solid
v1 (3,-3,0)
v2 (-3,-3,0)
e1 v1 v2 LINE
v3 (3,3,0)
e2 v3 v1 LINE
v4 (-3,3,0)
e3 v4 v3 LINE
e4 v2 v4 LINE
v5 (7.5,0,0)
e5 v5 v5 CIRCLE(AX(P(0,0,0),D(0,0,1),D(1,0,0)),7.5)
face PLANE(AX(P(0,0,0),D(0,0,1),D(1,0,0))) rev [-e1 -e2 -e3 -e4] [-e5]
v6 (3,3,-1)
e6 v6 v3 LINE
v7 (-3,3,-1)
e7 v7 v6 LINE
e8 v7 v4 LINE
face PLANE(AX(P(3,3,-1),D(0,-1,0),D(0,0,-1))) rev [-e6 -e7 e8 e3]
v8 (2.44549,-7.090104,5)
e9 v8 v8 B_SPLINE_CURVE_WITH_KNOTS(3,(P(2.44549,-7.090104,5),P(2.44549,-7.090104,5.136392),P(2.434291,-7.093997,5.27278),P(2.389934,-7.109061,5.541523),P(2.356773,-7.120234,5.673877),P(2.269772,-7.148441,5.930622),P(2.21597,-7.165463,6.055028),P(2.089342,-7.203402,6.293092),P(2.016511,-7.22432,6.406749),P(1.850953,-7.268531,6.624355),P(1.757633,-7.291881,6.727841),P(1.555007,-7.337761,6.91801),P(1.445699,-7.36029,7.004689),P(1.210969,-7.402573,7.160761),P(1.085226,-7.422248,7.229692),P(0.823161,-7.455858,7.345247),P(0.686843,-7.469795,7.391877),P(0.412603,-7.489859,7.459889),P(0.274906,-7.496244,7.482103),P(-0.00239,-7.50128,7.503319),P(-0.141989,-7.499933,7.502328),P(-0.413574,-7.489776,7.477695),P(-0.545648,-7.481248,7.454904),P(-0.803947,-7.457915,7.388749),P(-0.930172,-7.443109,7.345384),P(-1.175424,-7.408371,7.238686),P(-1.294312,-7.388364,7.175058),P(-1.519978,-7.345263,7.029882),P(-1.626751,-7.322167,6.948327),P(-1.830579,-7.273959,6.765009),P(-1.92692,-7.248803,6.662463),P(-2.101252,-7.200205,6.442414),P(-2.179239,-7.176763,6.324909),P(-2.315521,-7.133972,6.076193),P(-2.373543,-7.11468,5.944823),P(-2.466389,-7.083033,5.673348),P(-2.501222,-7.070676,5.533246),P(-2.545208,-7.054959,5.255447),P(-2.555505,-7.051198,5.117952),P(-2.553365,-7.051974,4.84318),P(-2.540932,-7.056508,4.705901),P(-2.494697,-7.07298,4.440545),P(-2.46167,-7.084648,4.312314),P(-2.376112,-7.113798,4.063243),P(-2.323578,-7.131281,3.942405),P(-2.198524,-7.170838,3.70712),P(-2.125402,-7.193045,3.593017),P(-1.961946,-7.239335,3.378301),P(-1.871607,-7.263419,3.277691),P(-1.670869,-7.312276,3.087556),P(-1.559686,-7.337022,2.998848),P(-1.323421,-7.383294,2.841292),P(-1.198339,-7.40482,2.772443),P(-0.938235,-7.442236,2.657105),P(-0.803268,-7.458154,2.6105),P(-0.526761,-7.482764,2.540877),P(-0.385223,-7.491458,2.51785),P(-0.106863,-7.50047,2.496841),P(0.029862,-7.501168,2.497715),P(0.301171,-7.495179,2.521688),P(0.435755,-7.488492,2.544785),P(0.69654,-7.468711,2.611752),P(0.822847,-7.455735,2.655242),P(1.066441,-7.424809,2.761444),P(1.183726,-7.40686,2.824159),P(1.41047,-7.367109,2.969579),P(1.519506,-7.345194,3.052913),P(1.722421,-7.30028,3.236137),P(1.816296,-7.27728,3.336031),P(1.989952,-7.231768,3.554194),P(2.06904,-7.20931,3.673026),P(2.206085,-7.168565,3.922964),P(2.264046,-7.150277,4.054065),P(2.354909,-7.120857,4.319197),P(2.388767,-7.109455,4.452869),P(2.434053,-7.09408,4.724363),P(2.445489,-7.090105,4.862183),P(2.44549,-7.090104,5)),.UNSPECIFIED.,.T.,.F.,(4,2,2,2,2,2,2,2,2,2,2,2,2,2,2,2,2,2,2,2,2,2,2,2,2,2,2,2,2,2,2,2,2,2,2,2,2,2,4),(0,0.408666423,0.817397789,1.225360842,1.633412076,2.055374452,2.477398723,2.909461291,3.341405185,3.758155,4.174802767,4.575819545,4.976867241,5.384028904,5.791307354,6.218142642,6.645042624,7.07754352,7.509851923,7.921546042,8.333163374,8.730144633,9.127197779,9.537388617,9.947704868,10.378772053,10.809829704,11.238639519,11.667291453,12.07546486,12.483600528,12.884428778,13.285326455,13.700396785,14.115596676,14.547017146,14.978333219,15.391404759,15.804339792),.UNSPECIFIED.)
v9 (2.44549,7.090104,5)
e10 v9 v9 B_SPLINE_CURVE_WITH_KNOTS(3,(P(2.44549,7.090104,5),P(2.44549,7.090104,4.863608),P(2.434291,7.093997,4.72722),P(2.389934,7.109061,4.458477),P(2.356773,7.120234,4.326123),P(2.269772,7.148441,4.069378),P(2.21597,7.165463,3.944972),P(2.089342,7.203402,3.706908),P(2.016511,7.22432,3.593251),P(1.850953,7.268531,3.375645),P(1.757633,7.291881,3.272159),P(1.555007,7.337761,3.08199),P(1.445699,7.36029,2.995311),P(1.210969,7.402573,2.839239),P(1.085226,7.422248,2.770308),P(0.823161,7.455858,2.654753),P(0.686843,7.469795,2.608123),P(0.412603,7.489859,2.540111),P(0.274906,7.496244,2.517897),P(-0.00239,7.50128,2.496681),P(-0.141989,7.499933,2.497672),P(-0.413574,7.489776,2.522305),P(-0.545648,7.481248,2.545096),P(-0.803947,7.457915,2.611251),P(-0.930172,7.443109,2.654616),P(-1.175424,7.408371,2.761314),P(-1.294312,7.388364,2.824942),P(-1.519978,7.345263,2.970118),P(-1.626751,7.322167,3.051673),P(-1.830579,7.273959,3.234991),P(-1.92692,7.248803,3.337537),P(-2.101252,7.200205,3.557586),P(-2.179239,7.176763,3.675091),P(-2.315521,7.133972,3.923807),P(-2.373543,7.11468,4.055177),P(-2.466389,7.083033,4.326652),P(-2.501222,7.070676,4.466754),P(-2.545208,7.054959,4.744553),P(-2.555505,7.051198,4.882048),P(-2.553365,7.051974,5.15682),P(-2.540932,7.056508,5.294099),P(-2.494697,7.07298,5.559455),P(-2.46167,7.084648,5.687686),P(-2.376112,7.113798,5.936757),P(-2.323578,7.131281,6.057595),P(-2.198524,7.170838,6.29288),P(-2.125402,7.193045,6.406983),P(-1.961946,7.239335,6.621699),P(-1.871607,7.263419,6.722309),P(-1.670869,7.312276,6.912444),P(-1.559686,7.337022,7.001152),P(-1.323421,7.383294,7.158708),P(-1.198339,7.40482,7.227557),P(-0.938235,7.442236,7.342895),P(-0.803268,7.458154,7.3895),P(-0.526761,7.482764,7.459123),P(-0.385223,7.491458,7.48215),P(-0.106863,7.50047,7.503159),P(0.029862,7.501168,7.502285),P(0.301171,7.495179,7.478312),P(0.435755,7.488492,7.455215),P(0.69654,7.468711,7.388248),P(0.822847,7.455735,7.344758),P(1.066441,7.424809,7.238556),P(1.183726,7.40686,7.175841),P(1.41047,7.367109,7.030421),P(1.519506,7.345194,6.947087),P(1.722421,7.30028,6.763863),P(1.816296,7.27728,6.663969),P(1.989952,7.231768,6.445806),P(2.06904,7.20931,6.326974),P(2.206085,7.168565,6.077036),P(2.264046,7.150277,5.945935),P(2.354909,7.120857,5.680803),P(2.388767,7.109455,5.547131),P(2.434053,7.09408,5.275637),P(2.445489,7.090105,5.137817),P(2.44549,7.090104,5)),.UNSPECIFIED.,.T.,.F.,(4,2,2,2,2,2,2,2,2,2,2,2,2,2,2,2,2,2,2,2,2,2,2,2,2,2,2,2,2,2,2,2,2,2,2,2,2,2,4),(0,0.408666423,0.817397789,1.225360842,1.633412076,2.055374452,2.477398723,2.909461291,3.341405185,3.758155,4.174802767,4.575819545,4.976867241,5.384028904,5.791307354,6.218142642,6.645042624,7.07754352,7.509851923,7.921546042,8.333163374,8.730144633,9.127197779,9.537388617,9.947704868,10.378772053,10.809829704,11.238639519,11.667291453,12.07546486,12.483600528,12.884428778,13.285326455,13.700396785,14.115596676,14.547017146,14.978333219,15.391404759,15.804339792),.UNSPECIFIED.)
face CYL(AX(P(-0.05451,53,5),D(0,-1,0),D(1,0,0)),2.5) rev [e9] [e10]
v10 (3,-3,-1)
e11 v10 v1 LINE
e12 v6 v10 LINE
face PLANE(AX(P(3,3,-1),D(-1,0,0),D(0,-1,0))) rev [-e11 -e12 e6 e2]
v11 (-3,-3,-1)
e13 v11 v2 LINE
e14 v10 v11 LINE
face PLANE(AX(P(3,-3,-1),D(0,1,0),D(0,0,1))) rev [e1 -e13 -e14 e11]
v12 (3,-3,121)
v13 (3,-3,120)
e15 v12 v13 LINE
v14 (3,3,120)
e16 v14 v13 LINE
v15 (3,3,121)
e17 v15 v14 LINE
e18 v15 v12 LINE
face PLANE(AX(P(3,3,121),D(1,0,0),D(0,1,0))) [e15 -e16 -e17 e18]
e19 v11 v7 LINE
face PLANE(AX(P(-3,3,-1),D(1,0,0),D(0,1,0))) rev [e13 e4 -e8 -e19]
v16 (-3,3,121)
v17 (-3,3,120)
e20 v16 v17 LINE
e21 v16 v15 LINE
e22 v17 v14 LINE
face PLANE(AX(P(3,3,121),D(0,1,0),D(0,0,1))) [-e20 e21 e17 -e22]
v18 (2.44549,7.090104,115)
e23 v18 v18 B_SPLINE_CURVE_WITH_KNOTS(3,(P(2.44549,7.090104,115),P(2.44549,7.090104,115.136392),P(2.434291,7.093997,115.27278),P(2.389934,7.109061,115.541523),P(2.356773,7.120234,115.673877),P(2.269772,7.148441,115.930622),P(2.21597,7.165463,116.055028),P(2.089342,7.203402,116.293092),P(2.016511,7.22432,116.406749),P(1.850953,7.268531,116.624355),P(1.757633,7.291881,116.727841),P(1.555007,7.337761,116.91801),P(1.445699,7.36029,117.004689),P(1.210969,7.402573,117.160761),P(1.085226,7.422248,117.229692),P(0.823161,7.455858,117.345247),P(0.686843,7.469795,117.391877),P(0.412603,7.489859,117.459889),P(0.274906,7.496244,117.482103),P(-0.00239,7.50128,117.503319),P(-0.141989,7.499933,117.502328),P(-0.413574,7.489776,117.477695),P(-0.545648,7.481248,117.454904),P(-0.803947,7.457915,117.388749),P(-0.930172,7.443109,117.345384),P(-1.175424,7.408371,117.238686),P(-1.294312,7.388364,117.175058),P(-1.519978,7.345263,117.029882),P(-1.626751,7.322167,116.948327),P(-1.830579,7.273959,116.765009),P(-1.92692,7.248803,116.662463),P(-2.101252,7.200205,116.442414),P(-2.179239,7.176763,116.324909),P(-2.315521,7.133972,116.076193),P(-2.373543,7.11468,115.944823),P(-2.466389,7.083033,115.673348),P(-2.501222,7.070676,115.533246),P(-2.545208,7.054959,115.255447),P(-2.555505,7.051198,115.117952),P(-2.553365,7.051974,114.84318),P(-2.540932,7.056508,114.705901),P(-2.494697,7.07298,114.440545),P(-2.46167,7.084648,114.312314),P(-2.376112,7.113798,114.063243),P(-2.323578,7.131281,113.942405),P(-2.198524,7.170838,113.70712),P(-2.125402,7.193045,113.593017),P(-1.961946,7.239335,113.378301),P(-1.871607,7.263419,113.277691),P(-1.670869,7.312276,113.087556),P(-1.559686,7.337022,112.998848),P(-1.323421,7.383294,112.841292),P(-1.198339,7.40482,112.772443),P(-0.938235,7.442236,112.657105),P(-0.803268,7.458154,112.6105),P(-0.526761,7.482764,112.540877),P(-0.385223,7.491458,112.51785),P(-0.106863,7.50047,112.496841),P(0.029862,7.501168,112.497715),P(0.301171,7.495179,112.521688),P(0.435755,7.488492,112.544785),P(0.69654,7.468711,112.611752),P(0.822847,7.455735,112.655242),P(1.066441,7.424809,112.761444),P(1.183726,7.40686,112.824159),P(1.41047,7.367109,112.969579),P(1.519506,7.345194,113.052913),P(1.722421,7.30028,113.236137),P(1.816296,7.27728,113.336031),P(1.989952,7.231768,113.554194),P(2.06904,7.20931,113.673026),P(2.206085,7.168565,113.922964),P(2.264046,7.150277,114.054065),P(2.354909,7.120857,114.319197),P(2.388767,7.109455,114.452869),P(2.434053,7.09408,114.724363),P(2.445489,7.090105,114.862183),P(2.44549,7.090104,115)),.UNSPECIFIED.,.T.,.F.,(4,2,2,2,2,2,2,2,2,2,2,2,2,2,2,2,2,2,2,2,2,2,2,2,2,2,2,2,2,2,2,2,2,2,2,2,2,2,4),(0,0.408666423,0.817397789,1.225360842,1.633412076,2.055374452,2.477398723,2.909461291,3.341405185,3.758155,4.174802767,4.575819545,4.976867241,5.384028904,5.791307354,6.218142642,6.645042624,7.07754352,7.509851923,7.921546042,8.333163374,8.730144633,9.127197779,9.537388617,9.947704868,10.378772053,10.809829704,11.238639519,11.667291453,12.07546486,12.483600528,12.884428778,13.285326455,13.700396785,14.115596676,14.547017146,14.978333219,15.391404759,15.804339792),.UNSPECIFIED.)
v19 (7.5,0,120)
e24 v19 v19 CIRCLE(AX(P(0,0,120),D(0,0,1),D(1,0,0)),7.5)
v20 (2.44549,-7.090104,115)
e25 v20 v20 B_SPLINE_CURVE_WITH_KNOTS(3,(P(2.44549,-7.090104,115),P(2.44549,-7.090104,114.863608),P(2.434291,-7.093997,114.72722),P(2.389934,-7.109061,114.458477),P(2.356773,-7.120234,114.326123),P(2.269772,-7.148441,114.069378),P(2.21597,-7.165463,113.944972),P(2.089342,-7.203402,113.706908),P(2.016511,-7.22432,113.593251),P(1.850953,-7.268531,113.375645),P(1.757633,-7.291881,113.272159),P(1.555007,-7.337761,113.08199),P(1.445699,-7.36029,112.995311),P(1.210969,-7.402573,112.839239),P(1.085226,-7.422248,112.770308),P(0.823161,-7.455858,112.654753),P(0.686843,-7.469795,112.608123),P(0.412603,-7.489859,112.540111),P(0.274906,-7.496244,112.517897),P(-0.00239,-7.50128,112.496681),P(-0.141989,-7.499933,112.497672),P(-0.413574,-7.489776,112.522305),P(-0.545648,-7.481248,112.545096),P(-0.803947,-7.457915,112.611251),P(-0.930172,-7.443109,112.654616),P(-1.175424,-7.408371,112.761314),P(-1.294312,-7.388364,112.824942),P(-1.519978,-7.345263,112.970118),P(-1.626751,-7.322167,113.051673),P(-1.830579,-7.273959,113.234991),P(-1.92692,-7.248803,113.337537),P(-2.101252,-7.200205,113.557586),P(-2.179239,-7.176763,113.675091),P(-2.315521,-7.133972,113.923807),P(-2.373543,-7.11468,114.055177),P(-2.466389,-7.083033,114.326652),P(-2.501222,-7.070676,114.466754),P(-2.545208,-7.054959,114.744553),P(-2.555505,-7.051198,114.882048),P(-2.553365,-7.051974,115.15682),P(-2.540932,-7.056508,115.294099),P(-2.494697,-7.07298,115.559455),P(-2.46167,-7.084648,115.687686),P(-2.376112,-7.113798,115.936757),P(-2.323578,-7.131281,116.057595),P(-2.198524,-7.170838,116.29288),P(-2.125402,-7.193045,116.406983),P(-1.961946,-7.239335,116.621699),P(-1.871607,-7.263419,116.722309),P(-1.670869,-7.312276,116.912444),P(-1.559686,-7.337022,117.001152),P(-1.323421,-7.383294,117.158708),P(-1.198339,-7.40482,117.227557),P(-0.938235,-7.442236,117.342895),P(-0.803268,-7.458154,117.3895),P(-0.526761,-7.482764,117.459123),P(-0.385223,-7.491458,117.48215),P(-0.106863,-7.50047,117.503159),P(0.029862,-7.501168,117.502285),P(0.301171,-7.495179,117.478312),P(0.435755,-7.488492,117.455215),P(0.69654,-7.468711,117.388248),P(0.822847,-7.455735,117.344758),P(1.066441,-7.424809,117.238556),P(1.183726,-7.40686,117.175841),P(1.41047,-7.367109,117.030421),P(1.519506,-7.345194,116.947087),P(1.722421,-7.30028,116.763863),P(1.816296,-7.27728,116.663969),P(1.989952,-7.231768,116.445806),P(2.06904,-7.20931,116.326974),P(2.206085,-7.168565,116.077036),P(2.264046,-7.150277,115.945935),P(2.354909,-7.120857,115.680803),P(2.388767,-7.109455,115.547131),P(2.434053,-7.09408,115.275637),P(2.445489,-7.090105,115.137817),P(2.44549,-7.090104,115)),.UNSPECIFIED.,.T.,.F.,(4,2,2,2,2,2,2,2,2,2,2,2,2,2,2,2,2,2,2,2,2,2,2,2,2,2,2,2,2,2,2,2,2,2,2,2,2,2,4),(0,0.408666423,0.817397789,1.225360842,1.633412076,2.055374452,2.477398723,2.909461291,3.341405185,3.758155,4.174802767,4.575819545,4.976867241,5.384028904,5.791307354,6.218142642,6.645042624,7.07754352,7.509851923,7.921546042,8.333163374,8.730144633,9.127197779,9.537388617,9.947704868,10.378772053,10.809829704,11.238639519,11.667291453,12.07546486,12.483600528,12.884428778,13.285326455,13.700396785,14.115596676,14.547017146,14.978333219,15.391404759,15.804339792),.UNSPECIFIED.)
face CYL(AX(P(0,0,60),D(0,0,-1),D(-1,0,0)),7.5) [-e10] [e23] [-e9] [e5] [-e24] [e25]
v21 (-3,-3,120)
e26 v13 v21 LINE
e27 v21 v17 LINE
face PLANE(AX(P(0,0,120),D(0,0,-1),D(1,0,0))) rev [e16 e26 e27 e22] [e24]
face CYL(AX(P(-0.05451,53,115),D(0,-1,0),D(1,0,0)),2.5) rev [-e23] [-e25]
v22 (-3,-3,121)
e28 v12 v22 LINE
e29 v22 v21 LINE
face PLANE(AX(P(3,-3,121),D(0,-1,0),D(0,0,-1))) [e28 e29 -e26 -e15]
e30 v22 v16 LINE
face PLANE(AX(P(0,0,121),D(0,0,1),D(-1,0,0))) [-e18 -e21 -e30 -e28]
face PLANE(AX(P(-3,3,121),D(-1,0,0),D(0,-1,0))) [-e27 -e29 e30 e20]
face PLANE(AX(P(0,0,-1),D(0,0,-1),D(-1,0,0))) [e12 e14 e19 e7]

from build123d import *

# Parameters (mm, degrees)
ESQUISSE1_R                 = 7.5
BOSS_EXTRU_1_DEPTH          = 60
ESQUISSE6_W                 = 6
ESQUISSE6_H                 = 6
BOSS_EXTRU_2_DEPTH          = 1
ENL_V_MAT_EXTRU_2_OUTLINE_W = 2.5
ENL_V_MAT_EXTRU_2_OUTLINE_H = 15.000451996


# Read off the part's stored shape, not the designer's step: Enlèv. mat.-Extru.2
with BuildPart() as part:
    # Esquisse1 → Boss.-Extru.1 (new body)
    with BuildSketch(Plane.XY):
        Circle(ESQUISSE1_R)
    boss_extru_1 = extrude(amount=BOSS_EXTRU_1_DEPTH)

    # Esquisse6 → Boss.-Extru.2 (add)
    with BuildSketch(Plane(origin=(0, 0, 0), x_dir=(-1, 0, 0), z_dir=(0, 0, -1))):
        Rectangle(ESQUISSE6_W, ESQUISSE6_H)
    boss_extru_2 = extrude(amount=BOSS_EXTRU_2_DEPTH)

    # Enlèv. mat.-Extru.2 outline → Enlèv. mat.-Extru.2 (revolve, cut)
    with BuildSketch(Plane(origin=(-0.054510378, 0, 5), x_dir=(1, 0, 0), z_dir=(0, 0, 1))):
        with Locations((1.25, 0)):
            Rectangle(ENL_V_MAT_EXTRU_2_OUTLINE_W, ENL_V_MAT_EXTRU_2_OUTLINE_H)
    enl_v_mat_extru_2 = revolve(axis=Axis((-0.054510378, 0, 5), (0, 1, 0)), mode=Mode.SUBTRACT)

    # Symétrie4: Boss.-Extru.1, Boss.-Extru.2, Enlèv. mat.-Extru.2 across plane
    add(boss_extru_1.mirror(Plane.XY.offset(60)))
    add(boss_extru_2.mirror(Plane.XY.offset(60)))
    add(enl_v_mat_extru_2.mirror(Plane.XY.offset(60)), mode=Mode.SUBTRACT)


solid = part.part
